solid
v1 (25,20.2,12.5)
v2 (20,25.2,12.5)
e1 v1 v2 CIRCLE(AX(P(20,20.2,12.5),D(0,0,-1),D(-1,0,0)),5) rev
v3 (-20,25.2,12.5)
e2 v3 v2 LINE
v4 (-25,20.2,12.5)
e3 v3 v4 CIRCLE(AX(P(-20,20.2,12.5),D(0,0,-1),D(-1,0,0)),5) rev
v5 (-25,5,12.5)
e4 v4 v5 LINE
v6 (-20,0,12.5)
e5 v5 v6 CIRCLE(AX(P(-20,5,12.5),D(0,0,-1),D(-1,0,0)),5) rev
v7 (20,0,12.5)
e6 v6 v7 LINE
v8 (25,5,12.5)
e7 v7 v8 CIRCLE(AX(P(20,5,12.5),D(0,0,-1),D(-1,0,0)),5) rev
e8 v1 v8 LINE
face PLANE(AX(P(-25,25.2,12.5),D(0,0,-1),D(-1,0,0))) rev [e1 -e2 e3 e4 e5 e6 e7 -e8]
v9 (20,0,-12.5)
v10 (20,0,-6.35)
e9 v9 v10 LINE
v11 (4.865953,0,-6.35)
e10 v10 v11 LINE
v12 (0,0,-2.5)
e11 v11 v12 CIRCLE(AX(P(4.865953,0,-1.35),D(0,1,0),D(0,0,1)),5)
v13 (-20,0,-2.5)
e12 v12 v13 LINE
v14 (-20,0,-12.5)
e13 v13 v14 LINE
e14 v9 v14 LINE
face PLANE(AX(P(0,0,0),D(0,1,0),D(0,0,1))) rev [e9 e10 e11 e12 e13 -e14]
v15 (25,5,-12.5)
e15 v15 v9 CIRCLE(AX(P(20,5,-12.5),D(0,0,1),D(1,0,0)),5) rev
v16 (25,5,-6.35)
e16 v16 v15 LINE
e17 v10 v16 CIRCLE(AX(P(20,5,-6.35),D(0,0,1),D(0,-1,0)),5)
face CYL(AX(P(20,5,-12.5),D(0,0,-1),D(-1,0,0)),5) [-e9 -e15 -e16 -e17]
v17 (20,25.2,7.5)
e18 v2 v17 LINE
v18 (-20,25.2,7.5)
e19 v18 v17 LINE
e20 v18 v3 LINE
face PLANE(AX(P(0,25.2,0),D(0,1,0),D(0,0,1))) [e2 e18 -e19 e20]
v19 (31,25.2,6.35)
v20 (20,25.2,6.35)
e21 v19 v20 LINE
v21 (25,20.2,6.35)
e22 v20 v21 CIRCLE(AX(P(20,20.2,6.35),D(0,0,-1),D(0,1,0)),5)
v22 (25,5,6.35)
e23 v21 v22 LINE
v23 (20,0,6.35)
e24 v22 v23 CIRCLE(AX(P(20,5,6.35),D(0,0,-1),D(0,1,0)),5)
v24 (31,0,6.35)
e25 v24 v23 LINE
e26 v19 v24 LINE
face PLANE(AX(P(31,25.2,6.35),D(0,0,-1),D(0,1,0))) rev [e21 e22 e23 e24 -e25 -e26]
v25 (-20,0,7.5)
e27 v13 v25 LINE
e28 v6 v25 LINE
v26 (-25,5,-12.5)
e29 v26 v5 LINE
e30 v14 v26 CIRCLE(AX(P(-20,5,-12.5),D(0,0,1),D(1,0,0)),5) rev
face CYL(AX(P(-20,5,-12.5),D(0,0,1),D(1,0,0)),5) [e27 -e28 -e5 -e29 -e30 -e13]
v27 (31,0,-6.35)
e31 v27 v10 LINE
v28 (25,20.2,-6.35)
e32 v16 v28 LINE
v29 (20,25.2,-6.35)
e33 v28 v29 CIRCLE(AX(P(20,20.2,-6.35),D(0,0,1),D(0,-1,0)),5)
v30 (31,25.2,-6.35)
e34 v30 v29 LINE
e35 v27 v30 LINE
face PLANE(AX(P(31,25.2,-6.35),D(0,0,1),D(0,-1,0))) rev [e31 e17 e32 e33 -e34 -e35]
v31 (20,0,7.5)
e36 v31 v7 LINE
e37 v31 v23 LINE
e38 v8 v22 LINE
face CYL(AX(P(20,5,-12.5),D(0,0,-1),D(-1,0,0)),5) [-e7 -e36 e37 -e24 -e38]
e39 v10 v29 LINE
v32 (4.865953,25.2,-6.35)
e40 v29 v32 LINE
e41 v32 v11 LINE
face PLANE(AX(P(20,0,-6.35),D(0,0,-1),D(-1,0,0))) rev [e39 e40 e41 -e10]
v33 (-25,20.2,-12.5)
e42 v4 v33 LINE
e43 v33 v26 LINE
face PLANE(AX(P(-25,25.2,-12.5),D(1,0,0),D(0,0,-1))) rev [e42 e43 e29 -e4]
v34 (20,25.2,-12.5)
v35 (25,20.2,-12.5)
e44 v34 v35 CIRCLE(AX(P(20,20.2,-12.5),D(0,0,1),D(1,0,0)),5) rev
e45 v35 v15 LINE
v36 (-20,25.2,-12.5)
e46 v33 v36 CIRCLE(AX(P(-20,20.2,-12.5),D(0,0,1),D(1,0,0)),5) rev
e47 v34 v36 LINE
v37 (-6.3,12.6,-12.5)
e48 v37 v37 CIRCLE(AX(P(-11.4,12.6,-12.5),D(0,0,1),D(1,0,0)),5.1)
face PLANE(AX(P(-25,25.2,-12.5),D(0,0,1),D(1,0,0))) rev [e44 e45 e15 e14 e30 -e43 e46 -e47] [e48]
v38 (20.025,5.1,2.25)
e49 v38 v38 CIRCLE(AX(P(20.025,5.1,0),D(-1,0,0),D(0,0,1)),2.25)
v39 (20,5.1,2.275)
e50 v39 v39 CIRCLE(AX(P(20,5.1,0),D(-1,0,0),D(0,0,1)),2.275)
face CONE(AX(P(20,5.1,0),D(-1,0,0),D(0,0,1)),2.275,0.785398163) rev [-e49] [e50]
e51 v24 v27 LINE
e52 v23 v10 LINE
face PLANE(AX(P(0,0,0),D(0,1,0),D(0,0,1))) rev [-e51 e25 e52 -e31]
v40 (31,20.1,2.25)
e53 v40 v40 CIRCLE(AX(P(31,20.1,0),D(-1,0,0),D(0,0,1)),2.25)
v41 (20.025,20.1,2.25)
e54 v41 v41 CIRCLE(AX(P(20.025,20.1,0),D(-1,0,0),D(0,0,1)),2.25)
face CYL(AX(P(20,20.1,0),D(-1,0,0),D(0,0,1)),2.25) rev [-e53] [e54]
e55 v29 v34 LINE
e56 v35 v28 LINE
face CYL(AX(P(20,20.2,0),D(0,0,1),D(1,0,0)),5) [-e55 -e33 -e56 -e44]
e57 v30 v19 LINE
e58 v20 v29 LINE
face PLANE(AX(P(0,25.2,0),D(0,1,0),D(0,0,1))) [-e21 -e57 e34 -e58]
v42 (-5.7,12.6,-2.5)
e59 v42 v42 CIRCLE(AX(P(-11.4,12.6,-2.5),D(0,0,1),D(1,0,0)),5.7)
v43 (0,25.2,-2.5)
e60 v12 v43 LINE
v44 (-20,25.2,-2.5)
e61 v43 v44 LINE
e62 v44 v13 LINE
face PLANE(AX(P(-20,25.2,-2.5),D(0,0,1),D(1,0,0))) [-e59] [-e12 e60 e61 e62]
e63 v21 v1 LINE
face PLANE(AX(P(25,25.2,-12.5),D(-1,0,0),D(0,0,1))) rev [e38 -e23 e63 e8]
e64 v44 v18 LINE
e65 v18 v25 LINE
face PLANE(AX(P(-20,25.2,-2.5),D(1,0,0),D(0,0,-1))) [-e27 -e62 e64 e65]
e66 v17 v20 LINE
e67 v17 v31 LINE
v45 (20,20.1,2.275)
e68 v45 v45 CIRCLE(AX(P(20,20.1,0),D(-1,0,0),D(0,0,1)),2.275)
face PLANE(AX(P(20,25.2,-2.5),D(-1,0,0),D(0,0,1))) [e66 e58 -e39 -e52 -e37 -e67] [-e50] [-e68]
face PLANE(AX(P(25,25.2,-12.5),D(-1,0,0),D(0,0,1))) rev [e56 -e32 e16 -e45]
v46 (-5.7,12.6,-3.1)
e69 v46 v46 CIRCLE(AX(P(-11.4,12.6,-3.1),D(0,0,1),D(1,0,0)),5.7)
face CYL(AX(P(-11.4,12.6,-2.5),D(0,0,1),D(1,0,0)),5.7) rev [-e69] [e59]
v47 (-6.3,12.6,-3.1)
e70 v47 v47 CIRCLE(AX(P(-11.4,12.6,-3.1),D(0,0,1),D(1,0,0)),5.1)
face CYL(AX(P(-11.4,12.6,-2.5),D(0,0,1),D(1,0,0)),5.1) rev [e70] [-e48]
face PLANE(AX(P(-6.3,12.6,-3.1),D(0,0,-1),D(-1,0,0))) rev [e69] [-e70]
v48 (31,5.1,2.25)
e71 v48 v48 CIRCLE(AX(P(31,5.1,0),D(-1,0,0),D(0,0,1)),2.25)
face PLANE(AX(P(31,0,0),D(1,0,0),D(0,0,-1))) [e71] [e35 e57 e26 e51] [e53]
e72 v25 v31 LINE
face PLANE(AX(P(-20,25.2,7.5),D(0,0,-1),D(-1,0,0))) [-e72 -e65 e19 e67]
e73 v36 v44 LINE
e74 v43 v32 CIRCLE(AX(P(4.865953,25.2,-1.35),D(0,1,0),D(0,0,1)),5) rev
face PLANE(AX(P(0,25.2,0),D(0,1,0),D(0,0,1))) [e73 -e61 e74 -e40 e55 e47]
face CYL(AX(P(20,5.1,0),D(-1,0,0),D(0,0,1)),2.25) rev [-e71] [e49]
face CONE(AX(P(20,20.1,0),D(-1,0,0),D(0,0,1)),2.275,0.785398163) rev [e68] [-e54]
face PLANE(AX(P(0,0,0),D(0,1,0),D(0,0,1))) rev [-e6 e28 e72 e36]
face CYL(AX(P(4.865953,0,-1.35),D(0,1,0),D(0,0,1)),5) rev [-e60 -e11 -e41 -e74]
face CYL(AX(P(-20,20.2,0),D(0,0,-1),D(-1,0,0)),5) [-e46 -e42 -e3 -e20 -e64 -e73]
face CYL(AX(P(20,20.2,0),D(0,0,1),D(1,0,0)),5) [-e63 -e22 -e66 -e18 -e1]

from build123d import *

# Parameters (mm, degrees)
SKETCH1_W                      = 50
SKETCH1_H                      = 25
SKETCH1_W_2                    = 40
SKETCH1_H_2                    = 10
BOSS_EXTRUDE1_DEPTH            = 25.2
HOLE1_D                        = 10.2
HOLE1_DEPTH                    = 10
HOLE1_CBORE_D                  = 11.4
HOLE1_CBORE_DEPTH              = 0.6
SKETCH10_W                     = 12.7
SKETCH10_H                     = 25.2
BOSS_EXTRUDE2_DEPTH            = 6
M4_CLEARANCE_HOLE1_D           = 4.5
M4_CLEARANCE_HOLE1_DEPTH       = 11
M4_CLEARANCE_HOLE1_CSINK_D     = 4.55
M4_CLEARANCE_HOLE1_CSINK_ANGLE = 90
SKETCH11_W                     = 20
SKETCH11_H                     = 3.85
CUT_EXTRUDE1_DEPTH             = 42.860363114
FILLET1_R                      = 5


with BuildPart() as part:
    # Sketch1 → Boss-Extrude1 (new body)
    with BuildSketch(Plane(origin=(0, 0, 0), x_dir=(1, 0, 0), z_dir=(0, 1, 0))):
        Rectangle(SKETCH1_W, SKETCH1_H)
        with Locations((0, -2.5)):
            Rectangle(SKETCH1_W_2, SKETCH1_H_2, mode=Mode.SUBTRACT)
    extrude(amount=BOSS_EXTRUDE1_DEPTH)

    # Hole1
    with Locations(Plane.XY.offset(-2.5)):
        with Locations((-11.4, 12.6)):
            CounterBoreHole(HOLE1_D / 2, HOLE1_CBORE_D / 2, HOLE1_CBORE_DEPTH, depth=HOLE1_DEPTH)

    # Sketch10 → Boss-Extrude2 (add)
    with BuildSketch(Plane(origin=(25, 0, 0), x_dir=(0, 0, -1), z_dir=(1, 0, 0))):
        with Locations((0, 12.6)):
            Rectangle(SKETCH10_W, SKETCH10_H)
    extrude(amount=BOSS_EXTRUDE2_DEPTH)

    # M4 Clearance Hole1
    with Locations(Plane.ZY.offset(-20)):
        with Locations((0, 20.1), (0, 5.1)):
            CounterSinkHole(M4_CLEARANCE_HOLE1_D / 2, M4_CLEARANCE_HOLE1_CSINK_D / 2, depth=M4_CLEARANCE_HOLE1_DEPTH, counter_sink_angle=M4_CLEARANCE_HOLE1_CSINK_ANGLE)

    # Sketch11 → Cut-Extrude1 (cut, through all)
    with BuildSketch(Plane(origin=(0, 25.2, 0), x_dir=(1, 0, 0), z_dir=(0, 1, 0))):
        with Locations((10, 4.425)):
            Rectangle(SKETCH11_W, SKETCH11_H)
    extrude(amount=-CUT_EXTRUDE1_DEPTH, mode=Mode.SUBTRACT)

    # Fillet1
    # the kernel refuses this fillet: 5 mm, written as the material it adds along each edge
    with BuildSketch(Plane(origin=(0, 25.2, -6.35), x_dir=(1, 0, 0), z_dir=(0, -1, 0))) as fillet1_piece_1:
        with BuildLine():
            CenterArc((4.865953144, 5), FILLET1_R, 193.297071747, 76.702928253)
            Line((0, 3.85), (0, 0))
            Line((0, 0), (4.865953144, 0))
        make_face()
    extrude(amount=25.2)
    # the kernel refuses this fillet: 5 mm, written as the material it takes off along each edge
    with BuildSketch(Plane(origin=(25, 0, -25), x_dir=(-1, 0, 0), z_dir=(0, 0, 1)), Plane(origin=(25, 0, 6.35), x_dir=(-1, 0, 0), z_dir=(0, 0, 1))) as fillet1_2_piece_1:
        with BuildLine():
            CenterArc((FILLET1_R, -FILLET1_R), FILLET1_R, 90, 90)
            Line((0, -FILLET1_R), (0, 0))
            Line((0, 0), (FILLET1_R, 0))
        make_face()
    extrude(amount=18.65, mode=Mode.SUBTRACT)
    with BuildSketch(Plane(origin=(25, 25.2, -25), x_dir=(-1, 0, 0), z_dir=(0, 0, 1)), Plane(origin=(25, 25.2, 6.35), x_dir=(-1, 0, 0), z_dir=(0, 0, 1))) as fillet1_2_piece_2:
        with BuildLine():
            CenterArc((FILLET1_R, FILLET1_R), FILLET1_R, 180, 90)
            Line((0, FILLET1_R), (0, 0))
            Line((0, 0), (FILLET1_R, 0))
        make_face()
    extrude(amount=18.65, mode=Mode.SUBTRACT)
    with BuildSketch(Plane(origin=(-25, 0, 25), x_dir=(0, 1, 0), z_dir=(0, 0, -1))) as fillet1_2_piece_3:
        with BuildLine():
            CenterArc((FILLET1_R, FILLET1_R), FILLET1_R, 180, 90)
            Line((0, FILLET1_R), (0, 0))
            Line((0, 0), (FILLET1_R, 0))
        make_face()
    extrude(amount=50, mode=Mode.SUBTRACT)
    with BuildSketch(Plane(origin=(-25, 25.2, 25), x_dir=(0, -1, 0), z_dir=(0, 0, -1))) as fillet1_2_piece_4:
        with BuildLine():
            CenterArc((FILLET1_R, -FILLET1_R), FILLET1_R, 90, 90)
            Line((0, -FILLET1_R), (0, 0))
            Line((0, 0), (FILLET1_R, 0))
        make_face()
    extrude(amount=50, mode=Mode.SUBTRACT)


solid = part.part
